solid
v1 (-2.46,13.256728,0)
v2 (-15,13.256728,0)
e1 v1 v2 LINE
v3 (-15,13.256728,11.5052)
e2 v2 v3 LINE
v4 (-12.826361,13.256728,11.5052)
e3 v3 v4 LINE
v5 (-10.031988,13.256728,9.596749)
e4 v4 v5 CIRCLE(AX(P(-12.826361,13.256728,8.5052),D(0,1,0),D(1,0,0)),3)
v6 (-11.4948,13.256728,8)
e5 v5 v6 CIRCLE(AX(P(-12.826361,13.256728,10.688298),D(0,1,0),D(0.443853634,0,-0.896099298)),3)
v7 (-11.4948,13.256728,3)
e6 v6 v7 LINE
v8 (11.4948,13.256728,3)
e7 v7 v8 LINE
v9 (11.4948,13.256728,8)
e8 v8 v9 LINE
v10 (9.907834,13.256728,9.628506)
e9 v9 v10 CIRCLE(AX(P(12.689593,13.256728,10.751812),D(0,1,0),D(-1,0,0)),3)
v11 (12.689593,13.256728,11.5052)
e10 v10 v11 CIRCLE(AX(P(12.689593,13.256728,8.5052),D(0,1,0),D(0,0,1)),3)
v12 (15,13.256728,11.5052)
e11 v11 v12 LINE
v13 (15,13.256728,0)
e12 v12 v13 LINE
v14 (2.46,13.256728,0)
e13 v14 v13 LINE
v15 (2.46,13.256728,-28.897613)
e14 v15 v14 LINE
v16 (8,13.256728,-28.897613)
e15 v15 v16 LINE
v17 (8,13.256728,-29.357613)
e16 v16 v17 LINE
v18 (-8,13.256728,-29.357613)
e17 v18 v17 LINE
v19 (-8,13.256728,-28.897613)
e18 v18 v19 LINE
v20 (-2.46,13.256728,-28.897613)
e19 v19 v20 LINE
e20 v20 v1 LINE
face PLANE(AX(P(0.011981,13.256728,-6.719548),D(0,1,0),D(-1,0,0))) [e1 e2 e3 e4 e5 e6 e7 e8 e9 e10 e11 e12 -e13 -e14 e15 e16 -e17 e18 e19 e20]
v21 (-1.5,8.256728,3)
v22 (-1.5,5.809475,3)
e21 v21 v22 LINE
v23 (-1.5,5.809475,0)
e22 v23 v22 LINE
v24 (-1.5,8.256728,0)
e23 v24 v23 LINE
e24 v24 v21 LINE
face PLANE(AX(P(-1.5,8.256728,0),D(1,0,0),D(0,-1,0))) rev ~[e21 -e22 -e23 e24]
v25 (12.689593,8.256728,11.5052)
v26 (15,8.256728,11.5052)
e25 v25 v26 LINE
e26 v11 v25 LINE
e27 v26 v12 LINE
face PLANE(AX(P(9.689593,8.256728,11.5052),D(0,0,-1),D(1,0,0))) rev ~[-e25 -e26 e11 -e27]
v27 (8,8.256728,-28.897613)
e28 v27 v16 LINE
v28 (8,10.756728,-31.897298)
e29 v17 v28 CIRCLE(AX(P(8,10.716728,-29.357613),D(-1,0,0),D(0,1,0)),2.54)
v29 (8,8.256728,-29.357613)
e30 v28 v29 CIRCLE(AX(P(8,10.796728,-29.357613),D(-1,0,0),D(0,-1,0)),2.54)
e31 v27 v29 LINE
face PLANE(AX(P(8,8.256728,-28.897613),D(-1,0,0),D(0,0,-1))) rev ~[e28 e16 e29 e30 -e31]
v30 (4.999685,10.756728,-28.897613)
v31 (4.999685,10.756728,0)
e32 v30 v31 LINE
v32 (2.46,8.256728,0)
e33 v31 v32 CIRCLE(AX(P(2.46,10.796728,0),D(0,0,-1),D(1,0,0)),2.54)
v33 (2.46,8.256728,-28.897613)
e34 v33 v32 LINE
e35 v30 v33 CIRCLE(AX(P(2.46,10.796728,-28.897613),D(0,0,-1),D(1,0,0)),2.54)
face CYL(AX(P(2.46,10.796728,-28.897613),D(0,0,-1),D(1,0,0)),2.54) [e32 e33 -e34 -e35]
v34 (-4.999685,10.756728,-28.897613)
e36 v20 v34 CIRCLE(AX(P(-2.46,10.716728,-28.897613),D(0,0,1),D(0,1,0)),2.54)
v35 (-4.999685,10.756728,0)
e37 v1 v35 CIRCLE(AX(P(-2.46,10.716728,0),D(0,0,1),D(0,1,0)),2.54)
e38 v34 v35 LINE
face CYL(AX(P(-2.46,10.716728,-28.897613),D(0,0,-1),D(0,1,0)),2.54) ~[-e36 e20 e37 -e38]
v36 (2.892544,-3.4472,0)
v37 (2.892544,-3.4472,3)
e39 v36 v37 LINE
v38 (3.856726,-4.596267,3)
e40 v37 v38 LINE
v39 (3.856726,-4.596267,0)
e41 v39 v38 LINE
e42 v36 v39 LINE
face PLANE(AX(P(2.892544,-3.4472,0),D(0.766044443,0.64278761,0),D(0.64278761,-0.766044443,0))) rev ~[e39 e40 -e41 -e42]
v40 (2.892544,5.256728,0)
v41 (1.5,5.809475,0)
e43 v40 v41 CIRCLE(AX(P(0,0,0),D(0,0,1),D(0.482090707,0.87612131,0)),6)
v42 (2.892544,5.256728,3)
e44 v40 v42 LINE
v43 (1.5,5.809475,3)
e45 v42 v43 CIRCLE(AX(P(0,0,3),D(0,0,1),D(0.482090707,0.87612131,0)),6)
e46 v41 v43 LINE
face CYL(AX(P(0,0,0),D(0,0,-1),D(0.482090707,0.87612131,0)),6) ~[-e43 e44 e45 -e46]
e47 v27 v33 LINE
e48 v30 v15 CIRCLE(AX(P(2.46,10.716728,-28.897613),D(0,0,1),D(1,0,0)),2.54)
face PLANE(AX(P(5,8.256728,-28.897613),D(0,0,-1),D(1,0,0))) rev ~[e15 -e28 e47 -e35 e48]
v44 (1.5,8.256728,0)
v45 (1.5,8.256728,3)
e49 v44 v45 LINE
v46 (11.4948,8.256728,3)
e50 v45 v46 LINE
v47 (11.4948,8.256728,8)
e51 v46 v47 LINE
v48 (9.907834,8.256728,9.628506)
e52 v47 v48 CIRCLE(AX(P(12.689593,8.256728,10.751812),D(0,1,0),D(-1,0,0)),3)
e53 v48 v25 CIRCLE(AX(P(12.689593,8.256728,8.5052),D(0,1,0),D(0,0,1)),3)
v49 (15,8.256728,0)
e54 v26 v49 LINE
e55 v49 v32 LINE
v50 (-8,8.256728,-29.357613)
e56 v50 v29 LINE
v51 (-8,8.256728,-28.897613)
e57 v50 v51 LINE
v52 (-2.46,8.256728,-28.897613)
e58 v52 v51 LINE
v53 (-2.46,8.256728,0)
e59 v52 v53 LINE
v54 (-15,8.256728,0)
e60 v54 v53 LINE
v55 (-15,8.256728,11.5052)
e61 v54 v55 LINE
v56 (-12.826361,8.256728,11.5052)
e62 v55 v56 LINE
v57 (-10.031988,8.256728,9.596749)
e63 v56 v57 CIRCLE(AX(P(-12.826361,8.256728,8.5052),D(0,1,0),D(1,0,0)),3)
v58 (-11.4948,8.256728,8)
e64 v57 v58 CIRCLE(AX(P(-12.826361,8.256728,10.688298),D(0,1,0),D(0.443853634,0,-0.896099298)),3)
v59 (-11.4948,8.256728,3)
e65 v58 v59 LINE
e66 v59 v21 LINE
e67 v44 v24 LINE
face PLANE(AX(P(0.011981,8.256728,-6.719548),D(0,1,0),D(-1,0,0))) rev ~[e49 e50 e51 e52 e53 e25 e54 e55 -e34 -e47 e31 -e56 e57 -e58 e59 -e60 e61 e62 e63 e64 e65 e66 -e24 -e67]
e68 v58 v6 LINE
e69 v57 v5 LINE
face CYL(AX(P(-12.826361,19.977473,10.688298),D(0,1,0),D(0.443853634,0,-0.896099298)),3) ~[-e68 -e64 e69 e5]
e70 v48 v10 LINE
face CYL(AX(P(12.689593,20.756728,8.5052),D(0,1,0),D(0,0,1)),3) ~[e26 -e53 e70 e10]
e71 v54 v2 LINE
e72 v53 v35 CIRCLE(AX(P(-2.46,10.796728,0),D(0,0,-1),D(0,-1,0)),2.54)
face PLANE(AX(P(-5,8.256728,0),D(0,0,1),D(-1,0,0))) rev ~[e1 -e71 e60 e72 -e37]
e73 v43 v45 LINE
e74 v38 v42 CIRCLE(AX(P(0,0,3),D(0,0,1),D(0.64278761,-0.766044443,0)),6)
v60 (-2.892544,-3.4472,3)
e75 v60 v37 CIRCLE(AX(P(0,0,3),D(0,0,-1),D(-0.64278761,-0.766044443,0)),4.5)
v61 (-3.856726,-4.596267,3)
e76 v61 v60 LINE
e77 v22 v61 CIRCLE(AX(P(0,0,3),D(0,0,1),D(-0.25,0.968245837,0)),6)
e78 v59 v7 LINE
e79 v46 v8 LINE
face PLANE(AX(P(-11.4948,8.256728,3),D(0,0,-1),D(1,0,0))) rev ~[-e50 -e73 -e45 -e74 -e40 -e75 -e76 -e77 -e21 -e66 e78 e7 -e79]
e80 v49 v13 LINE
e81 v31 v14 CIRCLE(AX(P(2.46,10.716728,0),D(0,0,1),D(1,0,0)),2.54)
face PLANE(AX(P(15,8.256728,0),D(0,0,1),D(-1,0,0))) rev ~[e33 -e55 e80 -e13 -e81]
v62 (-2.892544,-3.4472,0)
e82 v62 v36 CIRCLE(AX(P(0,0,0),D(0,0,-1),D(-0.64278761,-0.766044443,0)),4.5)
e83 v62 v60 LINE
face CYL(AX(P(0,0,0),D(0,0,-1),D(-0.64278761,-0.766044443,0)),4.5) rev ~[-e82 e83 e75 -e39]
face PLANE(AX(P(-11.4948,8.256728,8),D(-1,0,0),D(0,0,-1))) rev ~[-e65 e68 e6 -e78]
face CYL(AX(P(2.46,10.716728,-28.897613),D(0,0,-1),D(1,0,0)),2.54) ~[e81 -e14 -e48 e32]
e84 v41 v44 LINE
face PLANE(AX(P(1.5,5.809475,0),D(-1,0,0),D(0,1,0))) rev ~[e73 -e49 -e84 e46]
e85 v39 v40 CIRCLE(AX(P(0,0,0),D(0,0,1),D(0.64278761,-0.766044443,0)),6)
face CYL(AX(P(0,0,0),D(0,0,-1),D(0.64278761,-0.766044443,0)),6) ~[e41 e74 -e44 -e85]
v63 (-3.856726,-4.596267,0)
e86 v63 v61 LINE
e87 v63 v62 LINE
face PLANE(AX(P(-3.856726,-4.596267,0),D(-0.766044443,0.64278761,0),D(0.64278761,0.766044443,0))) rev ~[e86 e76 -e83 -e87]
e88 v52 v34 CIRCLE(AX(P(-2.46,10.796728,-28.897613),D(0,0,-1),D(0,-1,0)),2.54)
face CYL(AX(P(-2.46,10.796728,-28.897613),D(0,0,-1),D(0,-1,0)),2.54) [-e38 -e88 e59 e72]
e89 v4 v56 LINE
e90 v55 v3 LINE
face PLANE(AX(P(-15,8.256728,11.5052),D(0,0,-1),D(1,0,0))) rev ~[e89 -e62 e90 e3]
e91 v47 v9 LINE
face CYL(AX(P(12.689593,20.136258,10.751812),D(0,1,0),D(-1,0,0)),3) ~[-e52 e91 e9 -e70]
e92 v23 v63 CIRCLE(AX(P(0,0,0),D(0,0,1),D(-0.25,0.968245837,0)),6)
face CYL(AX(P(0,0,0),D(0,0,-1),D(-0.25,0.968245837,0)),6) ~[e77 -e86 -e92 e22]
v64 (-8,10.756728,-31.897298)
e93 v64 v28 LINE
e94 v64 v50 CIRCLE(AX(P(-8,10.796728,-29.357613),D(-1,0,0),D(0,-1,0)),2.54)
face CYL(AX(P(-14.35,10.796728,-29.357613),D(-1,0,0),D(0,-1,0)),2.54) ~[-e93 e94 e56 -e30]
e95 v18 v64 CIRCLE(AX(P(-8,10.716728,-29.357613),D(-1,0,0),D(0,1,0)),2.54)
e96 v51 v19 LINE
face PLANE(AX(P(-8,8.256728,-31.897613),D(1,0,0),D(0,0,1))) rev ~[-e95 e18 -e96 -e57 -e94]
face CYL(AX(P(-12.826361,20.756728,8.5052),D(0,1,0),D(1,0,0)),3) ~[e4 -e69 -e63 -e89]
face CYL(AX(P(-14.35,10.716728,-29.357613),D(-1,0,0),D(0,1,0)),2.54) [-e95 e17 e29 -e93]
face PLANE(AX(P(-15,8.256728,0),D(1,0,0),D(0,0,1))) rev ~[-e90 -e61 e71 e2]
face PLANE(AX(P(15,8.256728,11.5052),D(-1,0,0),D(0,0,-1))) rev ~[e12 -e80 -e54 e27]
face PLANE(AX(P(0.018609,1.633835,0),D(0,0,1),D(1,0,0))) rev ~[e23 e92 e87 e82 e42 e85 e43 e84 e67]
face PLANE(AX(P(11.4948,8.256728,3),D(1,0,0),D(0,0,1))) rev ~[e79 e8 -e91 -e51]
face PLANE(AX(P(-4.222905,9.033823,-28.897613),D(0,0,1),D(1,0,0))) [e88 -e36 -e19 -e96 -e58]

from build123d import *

# Parameters (mm, degrees)
F1_DEPTH    = 3
F3_DEPTH    = 5
F4_T1_DEPTH = 20
F4_T3_DEPTH = 18.7590602534
F4_T5_DEPTH = 18.4414894703
F5_T1_DEPTH = 28.8976125792
F5_T3_DEPTH = 28.7


# Not quite as in the source:
# - a fillet or chamfer that OpenCascade refuses, or shapes differently, is made with other operations: its cross-section is extruded or revolved along the edge and cut away or added


with BuildPart() as f1:
    # F0 (on Top) → F1 (new body)
    with BuildSketch(Plane.XY):
        with BuildLine():
            ThreePointArc((-2.8925442436, -3.447199994), (0, 4.5), (2.8925442436, -3.447199994))
            Line((2.8925442436, -3.447199994), (3.8567256581, -4.5962666587))
            ThreePointArc((3.8567256581, -4.5962666587), (5.9714768944, 0.5843489538), (2.8925442436, 5.2567278605))
            ThreePointArc((2.8925442436, 5.2567278605), (2.2135929139, 5.5767379723), (1.5, 5.8094750193))
            Line((1.5, 5.8094750193), (1.5, 8.2567278605))
            Line((1.5, 8.2567278605), (-1.5, 8.2567278605))
            Line((-1.5, 8.2567278605), (-1.5, 5.8094750193))
            ThreePointArc((-1.5, 5.8094750193), (-5.8517939481, 1.3253330104), (-3.8567256581, -4.5962666587))
            Line((-3.8567256581, -4.5962666587), (-2.8925442436, -3.447199994))
        make_face()
    extrude(amount=F1_DEPTH)

    # F2 (on face) → F3 (join)
    with BuildSketch(Plane(origin=(0, 8.2567278605, 0), x_dir=(-1, 0, 0), z_dir=(0, 1, 0))):
        Polygon((-15, 0), (-5, 0), (-5, -28.8976125792), (-8, -28.8976125792), (-8, -31.8976125792), (8, -31.8976125792), (8, -28.8976125792), (5, -28.8976125792), (5, 0), (15, 0), (15, 3), (15, 8), (15, 11.5052), (9.8263609009, 11.5052), (9.8263609009, 8), (11.4948, 8), (11.4948, 3), (0, 3), (-11.4948, 3), (-11.4948, 8), (-9.6895930523, 8), (-9.6895930523, 11.5052), (-13.1947930523, 11.5052), (-15, 11.5052), (-15, 8), (-15, 3), align=None)
    extrude(amount=F3_DEPTH)

    # F4: fillet of radius 3 on 4 edges, made by hand

    # F4_s2 → F4_t1 (cut)
    with BuildSketch(Plane.XZ.offset(-20.7567278605)):
        with BuildLine():
            ThreePointArc((12.6895930523, 11.5052), (10.5682727087, 10.6265203436), (9.6895930523, 8.5052))
            Line((9.6895930523, 8.5052), (9.6895930523, 11.5052))
            Line((9.6895930523, 11.5052), (12.6895930523, 11.5052))
        make_face()
        with BuildLine():
            ThreePointArc((-9.8263609009, 8.5052), (-10.7050405574, 10.6265203436), (-12.8263609009, 11.5052))
            Line((-12.8263609009, 11.5052), (-9.8263609009, 11.5052))
            Line((-9.8263609009, 11.5052), (-9.8263609009, 8.5052))
        make_face()
    extrude(amount=F4_T1_DEPTH, mode=Mode.SUBTRACT)

    # F4_s4 → F4_t3 (cut)
    with BuildSketch(Plane.XZ.offset(-20.1362579871)):
        with BuildLine():
            ThreePointArc((9.6895930523, 10.7518120507), (10.1811693284, 9.1062694588), (11.4948, 8))
            Line((11.4948, 8), (9.6895930523, 8))
            Line((9.6895930523, 8), (9.6895930523, 10.7518120507))
        make_face()
    extrude(amount=F4_T3_DEPTH, mode=Mode.SUBTRACT)

    # F4_s6 → F4_t5 (cut)
    with BuildSketch(Plane.XZ.offset(-19.9774725956)):
        with BuildLine():
            ThreePointArc((-11.4948, 8), (-10.2773726013, 9.1063185489), (-9.8263609009, 10.6882978941))
            Line((-9.8263609009, 10.6882978941), (-9.8263609009, 8))
            Line((-9.8263609009, 8), (-11.4948, 8))
        make_face()
    extrude(amount=F4_T5_DEPTH, mode=Mode.SUBTRACT)

    # F5: fillet of radius 2.54 on 6 edges, made by hand

    # F5_s2 → F5_t1 (cut)
    with BuildSketch(Plane.XY.offset(-28.8976125792)):
        with BuildLine():
            ThreePointArc((5, 10.7167278605), (4.2560512242, 12.5127790847), (2.46, 13.2567278605))
            Line((2.46, 13.2567278605), (5, 13.2567278605))
            Line((5, 13.2567278605), (5, 10.7167278605))
        make_face()
        with BuildLine():
            ThreePointArc((5, 10.7967278605), (4.2560512242, 9.0006766362), (2.46, 8.2567278605))
            Line((2.46, 8.2567278605), (5, 8.2567278605))
            Line((5, 8.2567278605), (5, 10.7967278605))
        make_face()
        with BuildLine():
            ThreePointArc((-2.46, 8.2567278605), (-4.2560512242, 9.0006766362), (-5, 10.7967278605))
            Line((-5, 10.7967278605), (-5, 8.2567278605))
            Line((-5, 8.2567278605), (-2.46, 8.2567278605))
        make_face()
        with BuildLine():
            ThreePointArc((-2.46, 13.2567278605), (-4.2560512242, 12.5127790847), (-5, 10.7167278605))
            Line((-5, 10.7167278605), (-5, 13.2567278605))
            Line((-5, 13.2567278605), (-2.46, 13.2567278605))
        make_face()
    extrude(amount=F5_T1_DEPTH, mode=Mode.SUBTRACT)

    # F5_s4 → F5_t3 (cut)
    with BuildSketch(Plane.YZ.offset(-14.35)):
        with BuildLine():
            ThreePointArc((8.2567278605, -29.3576125792), (9.0006766362, -31.1536638034), (10.7967278605, -31.8976125792))
            Line((10.7967278605, -31.8976125792), (8.2567278605, -31.8976125792))
            Line((8.2567278605, -31.8976125792), (8.2567278605, -29.3576125792))
        make_face()
        with BuildLine():
            ThreePointArc((13.2567278605, -29.3576125792), (12.5127790847, -31.1536638034), (10.7167278605, -31.8976125792))
            Line((10.7167278605, -31.8976125792), (13.2567278605, -31.8976125792))
            Line((13.2567278605, -31.8976125792), (13.2567278605, -29.3576125792))
        make_face()
    extrude(amount=F5_T3_DEPTH, mode=Mode.SUBTRACT)


solid = f1.part
